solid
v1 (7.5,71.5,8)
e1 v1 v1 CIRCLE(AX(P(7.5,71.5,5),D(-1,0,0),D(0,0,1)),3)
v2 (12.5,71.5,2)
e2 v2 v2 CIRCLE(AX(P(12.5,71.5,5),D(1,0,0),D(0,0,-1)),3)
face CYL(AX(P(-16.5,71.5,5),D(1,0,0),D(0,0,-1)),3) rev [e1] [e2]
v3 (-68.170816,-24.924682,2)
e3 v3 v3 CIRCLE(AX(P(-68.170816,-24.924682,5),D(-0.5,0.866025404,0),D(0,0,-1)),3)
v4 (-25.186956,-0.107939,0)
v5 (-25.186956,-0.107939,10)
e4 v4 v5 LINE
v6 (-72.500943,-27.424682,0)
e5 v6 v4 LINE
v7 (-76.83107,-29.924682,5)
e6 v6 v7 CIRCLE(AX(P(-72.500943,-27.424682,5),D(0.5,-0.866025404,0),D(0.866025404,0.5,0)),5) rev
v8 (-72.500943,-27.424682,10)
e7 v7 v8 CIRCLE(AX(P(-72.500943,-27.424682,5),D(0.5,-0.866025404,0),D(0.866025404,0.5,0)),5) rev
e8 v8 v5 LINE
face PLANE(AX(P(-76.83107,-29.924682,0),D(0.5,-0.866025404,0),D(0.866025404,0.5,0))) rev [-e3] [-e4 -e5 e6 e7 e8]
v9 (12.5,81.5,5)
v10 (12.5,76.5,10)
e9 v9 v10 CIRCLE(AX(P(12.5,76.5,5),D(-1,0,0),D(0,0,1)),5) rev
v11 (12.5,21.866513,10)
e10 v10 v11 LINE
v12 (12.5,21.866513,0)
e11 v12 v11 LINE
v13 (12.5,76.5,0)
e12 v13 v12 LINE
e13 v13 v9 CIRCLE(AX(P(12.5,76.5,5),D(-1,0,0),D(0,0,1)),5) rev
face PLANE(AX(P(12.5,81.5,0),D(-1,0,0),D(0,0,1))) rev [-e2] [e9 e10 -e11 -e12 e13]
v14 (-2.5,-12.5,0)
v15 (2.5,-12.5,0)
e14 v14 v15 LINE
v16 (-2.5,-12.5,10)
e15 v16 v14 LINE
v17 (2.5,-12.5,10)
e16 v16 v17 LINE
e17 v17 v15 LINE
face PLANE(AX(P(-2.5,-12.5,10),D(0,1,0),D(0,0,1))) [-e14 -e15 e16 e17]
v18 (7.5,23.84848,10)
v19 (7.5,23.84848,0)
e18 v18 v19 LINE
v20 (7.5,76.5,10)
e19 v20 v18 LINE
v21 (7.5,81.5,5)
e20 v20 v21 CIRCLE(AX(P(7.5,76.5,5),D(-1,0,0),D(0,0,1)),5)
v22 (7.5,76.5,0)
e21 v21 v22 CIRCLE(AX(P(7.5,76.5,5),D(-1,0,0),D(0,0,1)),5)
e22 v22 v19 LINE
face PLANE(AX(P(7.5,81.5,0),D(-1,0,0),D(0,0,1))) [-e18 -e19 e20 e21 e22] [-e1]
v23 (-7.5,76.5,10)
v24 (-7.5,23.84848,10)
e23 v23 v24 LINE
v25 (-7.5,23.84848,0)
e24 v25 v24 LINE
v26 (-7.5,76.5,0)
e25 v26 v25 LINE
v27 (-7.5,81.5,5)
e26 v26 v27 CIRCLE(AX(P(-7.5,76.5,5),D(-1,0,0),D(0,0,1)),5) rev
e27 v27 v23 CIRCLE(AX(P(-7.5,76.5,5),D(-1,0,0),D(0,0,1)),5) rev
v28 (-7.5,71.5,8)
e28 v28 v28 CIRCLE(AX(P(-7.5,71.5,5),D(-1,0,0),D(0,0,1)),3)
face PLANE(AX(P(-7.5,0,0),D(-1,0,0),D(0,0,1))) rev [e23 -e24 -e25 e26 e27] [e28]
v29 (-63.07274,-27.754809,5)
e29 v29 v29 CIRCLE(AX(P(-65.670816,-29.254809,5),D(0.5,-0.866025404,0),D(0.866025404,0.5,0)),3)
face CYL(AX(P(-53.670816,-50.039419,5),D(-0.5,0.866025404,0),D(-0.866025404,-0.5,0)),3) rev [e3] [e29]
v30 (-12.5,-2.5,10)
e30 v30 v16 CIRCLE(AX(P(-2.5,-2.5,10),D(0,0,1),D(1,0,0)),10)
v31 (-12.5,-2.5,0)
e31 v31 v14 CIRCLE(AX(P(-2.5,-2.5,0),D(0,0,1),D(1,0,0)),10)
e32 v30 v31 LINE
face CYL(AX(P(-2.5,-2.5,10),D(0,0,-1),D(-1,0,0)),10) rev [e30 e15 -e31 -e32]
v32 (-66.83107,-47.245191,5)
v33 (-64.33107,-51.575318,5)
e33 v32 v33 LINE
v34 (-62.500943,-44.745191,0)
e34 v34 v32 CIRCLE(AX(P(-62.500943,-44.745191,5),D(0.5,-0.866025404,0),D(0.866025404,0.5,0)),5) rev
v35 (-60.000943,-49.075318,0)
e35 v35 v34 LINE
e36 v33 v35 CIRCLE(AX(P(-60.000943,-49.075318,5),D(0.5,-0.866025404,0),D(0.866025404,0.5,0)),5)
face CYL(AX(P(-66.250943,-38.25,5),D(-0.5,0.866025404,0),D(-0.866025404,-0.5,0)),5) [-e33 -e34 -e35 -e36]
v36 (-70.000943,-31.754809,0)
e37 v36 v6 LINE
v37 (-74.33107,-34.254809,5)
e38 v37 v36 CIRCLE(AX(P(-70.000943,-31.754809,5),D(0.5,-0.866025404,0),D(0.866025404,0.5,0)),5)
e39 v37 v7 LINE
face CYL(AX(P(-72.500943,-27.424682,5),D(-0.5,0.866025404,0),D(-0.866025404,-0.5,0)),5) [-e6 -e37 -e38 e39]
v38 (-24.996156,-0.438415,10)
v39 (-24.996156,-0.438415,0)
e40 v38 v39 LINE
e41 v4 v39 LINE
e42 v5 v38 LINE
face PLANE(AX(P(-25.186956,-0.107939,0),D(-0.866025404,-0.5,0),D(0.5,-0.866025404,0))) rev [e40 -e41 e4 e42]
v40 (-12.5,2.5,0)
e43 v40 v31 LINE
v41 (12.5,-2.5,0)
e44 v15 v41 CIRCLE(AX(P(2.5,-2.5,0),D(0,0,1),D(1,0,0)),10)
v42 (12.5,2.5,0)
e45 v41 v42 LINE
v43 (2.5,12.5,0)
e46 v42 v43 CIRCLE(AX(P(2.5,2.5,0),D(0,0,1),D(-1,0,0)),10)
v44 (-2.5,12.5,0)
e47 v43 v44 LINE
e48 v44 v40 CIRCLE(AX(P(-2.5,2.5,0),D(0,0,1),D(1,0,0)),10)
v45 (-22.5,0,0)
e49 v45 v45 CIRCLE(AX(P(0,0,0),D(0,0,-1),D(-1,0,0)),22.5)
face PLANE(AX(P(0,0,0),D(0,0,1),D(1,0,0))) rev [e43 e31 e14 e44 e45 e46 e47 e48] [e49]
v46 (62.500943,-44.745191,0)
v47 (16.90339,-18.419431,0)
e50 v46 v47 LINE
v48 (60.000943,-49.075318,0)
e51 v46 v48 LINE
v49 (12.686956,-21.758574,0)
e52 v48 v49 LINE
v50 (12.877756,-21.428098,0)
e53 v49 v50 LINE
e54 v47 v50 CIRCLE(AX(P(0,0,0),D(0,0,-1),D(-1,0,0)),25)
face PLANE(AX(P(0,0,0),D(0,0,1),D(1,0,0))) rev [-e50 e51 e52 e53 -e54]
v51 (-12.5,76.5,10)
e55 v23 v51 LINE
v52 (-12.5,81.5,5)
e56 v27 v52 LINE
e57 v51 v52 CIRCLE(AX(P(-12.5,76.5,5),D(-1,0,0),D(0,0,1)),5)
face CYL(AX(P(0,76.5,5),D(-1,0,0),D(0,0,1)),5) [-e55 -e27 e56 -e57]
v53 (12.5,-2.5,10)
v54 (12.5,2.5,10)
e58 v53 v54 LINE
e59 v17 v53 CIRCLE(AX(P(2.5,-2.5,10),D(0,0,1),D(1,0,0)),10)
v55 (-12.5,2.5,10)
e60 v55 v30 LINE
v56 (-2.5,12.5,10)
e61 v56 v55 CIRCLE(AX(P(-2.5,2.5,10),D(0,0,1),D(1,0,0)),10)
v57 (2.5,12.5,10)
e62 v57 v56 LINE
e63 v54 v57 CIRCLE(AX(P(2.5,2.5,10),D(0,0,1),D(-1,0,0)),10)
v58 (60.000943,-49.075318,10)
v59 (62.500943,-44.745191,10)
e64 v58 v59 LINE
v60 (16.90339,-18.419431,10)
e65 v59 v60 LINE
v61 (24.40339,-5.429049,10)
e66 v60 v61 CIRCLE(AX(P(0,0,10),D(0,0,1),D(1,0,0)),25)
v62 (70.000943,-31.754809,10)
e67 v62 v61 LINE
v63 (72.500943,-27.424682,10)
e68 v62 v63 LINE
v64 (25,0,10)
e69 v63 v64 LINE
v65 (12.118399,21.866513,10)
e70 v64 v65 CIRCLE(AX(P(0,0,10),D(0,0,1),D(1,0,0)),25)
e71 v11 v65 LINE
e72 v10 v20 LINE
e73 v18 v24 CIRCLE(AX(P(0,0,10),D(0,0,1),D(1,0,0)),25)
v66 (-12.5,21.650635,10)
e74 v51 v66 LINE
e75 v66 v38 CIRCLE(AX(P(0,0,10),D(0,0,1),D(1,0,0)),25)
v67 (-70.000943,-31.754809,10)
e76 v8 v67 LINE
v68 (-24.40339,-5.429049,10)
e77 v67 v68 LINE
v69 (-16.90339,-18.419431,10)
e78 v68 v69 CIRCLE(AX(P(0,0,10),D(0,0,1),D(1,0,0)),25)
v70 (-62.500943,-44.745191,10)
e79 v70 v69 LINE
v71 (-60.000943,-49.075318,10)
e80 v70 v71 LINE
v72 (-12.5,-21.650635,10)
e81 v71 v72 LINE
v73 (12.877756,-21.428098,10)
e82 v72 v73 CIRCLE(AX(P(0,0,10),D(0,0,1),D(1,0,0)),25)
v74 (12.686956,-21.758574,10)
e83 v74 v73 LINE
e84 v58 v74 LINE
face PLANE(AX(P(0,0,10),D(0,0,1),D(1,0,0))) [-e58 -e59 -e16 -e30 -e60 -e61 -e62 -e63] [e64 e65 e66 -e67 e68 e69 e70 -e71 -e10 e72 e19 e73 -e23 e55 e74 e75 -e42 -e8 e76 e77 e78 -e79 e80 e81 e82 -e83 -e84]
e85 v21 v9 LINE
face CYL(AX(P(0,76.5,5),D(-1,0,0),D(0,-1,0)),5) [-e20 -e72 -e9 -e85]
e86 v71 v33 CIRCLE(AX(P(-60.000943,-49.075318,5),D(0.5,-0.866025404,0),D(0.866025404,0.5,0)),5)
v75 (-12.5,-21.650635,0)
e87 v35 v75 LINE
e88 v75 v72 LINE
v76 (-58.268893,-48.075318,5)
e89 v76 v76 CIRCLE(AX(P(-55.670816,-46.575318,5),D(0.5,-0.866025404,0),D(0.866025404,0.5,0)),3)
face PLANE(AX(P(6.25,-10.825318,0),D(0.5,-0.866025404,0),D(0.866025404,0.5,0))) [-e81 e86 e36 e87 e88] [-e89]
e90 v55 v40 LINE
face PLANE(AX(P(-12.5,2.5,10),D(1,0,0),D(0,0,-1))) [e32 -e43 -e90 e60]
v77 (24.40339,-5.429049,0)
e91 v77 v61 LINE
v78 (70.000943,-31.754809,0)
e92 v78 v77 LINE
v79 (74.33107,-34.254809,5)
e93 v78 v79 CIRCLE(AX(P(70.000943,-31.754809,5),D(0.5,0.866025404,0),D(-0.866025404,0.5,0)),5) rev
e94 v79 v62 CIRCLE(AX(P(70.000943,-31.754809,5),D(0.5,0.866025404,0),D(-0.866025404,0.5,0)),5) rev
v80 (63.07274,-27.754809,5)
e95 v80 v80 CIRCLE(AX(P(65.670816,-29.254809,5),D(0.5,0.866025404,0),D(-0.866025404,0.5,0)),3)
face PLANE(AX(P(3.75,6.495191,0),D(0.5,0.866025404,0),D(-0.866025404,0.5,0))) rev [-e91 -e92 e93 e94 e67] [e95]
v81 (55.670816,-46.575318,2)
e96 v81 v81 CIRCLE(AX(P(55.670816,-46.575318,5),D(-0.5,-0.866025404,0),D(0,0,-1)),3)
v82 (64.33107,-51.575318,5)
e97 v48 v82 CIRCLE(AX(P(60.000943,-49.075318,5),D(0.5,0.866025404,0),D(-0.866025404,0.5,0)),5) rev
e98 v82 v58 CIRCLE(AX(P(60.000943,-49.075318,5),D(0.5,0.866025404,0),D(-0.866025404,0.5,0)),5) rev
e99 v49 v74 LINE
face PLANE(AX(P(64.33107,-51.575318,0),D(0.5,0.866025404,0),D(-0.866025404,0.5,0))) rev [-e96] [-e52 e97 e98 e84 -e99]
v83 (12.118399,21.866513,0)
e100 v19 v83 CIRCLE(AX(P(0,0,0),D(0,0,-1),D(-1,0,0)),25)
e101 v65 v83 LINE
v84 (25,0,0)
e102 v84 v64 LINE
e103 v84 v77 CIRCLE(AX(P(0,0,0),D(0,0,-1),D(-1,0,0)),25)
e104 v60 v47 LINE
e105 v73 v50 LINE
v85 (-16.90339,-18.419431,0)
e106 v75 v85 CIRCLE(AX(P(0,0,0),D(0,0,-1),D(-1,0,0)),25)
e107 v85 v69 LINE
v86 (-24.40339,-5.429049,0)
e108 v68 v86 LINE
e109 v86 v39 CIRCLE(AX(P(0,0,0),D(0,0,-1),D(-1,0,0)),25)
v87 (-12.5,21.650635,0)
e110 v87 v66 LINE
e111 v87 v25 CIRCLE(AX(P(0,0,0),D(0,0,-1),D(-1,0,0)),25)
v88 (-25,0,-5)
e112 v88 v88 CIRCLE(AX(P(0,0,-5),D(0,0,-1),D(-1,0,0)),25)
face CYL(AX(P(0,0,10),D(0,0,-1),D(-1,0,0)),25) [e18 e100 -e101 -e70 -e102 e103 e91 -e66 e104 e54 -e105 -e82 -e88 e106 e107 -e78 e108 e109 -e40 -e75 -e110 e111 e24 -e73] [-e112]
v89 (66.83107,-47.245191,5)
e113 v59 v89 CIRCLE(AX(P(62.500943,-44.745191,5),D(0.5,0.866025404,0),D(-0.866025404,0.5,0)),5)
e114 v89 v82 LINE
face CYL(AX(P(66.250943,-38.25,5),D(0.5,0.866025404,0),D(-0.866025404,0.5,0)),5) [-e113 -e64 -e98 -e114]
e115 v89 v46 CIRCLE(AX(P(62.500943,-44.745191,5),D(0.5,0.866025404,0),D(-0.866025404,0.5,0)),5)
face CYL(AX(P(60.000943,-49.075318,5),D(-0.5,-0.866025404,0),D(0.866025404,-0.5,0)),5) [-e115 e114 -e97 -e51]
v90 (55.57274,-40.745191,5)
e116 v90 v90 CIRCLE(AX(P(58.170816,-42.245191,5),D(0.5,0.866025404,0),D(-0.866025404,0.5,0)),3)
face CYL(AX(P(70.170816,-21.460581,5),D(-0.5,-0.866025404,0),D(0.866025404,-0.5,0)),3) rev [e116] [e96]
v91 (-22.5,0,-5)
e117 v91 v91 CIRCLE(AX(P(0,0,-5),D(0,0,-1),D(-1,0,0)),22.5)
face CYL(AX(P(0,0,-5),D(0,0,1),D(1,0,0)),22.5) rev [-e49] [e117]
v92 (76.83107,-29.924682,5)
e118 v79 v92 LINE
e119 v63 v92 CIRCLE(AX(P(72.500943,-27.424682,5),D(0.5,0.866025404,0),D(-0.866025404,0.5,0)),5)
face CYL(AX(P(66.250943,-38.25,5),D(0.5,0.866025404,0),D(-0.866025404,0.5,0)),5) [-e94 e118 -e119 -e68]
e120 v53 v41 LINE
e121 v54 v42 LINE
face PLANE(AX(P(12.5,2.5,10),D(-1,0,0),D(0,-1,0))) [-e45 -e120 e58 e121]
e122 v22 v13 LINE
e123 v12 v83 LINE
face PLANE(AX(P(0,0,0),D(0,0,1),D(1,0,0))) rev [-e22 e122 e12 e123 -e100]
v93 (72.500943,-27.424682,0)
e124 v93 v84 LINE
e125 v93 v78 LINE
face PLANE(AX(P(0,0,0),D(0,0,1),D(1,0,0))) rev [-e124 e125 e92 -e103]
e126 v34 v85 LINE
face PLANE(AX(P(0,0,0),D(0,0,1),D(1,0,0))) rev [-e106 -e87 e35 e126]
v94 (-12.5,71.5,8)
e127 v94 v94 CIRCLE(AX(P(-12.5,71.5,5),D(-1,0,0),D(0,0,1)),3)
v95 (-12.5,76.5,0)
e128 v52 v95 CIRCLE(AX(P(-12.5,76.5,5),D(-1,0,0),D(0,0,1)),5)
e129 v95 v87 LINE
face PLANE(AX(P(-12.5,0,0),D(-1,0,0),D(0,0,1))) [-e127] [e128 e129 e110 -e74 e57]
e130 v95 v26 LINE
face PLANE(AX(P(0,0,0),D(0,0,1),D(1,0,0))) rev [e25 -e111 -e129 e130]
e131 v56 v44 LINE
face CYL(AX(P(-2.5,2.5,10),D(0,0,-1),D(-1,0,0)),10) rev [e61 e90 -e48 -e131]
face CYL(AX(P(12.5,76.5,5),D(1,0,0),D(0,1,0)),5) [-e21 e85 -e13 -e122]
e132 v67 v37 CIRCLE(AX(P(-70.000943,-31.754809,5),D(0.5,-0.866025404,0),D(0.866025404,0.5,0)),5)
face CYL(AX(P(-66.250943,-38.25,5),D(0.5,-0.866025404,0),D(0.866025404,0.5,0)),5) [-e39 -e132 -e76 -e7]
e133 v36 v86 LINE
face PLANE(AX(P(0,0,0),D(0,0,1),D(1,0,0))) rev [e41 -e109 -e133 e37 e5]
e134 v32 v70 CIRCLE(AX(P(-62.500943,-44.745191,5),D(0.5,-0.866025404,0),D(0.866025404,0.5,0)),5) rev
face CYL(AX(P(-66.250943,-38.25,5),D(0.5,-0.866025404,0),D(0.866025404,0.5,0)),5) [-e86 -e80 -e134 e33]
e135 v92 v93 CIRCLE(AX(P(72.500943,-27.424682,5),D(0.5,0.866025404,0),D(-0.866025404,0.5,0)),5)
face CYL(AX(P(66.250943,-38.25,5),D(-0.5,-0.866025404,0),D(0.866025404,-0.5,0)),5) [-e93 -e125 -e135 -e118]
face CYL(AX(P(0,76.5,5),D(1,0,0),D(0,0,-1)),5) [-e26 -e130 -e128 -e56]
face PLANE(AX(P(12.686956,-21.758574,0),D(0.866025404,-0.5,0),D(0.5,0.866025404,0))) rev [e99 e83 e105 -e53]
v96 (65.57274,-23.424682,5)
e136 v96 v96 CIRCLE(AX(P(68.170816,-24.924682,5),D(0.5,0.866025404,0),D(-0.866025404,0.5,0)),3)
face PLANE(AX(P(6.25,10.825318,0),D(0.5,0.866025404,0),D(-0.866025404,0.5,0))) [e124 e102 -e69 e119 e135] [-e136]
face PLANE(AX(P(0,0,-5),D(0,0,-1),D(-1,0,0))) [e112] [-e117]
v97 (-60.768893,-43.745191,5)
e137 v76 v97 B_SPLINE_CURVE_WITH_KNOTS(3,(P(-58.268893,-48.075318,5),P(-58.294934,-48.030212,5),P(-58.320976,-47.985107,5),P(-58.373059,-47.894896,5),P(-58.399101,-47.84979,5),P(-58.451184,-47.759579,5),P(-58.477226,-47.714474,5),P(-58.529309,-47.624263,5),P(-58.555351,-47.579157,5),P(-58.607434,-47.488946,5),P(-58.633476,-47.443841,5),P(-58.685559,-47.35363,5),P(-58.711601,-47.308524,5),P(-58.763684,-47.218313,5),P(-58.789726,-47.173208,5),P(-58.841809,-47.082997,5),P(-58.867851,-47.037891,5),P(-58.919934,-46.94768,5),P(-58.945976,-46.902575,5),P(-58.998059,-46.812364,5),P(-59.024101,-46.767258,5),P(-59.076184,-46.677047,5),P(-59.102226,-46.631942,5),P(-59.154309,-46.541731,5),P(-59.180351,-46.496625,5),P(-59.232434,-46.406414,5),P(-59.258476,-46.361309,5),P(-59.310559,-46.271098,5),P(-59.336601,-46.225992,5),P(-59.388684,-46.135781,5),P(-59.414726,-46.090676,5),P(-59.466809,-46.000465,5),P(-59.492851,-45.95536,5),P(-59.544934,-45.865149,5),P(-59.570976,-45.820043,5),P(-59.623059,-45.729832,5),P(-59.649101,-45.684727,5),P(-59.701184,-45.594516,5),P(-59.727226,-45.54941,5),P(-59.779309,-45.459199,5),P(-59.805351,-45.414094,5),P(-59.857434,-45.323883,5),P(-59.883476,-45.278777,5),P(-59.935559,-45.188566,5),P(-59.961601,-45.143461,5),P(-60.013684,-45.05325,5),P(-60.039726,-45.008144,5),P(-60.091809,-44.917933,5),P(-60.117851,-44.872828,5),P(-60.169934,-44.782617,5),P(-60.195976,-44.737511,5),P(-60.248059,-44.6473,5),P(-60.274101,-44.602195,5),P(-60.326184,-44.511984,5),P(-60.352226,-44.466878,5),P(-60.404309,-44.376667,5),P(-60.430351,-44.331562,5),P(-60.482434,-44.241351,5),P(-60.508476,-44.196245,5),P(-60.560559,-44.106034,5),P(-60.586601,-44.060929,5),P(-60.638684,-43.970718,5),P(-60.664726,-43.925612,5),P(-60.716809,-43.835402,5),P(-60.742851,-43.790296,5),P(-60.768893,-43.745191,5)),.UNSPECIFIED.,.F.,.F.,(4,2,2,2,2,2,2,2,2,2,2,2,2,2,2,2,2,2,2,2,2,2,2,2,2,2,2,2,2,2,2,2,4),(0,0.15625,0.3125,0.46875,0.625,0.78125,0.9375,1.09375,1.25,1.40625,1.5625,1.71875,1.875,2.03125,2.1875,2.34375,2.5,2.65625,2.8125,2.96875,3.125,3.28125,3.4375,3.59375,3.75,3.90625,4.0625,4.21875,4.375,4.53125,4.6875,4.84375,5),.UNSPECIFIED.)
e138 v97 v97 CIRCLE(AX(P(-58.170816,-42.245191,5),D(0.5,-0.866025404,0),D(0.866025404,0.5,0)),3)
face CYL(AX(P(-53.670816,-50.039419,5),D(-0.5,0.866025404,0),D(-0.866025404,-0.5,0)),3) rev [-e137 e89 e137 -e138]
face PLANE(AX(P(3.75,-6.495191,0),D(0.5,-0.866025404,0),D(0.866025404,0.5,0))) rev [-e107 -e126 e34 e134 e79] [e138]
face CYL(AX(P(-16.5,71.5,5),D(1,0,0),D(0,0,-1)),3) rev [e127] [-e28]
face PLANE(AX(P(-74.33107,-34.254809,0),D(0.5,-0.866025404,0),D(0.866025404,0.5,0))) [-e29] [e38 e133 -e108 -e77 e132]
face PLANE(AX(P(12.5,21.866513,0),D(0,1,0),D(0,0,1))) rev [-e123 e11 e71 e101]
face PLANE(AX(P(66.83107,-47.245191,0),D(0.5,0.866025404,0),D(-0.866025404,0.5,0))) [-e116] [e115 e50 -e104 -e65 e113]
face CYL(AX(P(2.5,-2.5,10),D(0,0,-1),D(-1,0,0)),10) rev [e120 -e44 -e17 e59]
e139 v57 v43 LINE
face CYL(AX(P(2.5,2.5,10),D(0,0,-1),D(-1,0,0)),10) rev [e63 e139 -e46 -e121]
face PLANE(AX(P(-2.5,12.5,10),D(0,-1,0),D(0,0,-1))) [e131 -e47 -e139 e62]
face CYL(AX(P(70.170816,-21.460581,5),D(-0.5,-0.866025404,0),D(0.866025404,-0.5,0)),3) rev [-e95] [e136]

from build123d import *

# Parameters (mm, degrees)
SKETCH1_R                = 25
BOSS_EXTRUDE1_DEPTH      = 10
BOSS_EXTRUDE3_START      = -10
SKETCH2_W                = 5
SKETCH2_H                = 59.633486872
BOSS_EXTRUDE3_DEPTH      = 10
SKETCH3_R                = 3
CUT_EXTRUDE1_DEPTH       = 29
FILLET1_R                = 5
CIRPATTERN1_COUNT        = 3
FILLET1_OF_CIRPATTERN1_R = 5
BOSS_EXTRUDE5_START      = 5
SKETCH5_R                = 25
SKETCH5_R_2              = 22.5
BOSS_EXTRUDE5_DEPTH      = 5


with BuildPart() as part:
    # Sketch1 → Boss-Extrude1 (new body)
    with BuildSketch(Plane.XY):
        Circle(SKETCH1_R)
        with BuildLine():
            Line((-2.5, 12.5), (2.5, 12.5))
            ThreePointArc((2.5, 12.5), (9.571067812, 9.571067812), (12.5, 2.5))
            Line((12.5, 2.5), (12.5, -2.5))
            ThreePointArc((12.5, -2.5), (9.571067812, -9.571067812), (2.5, -12.5))
            Line((2.5, -12.5), (-2.5, -12.5))
            ThreePointArc((-2.5, -12.5), (-9.571067812, -9.571067812), (-12.5, -2.5))
            Line((-12.5, -2.5), (-12.5, 2.5))
            ThreePointArc((-12.5, 2.5), (-9.571067812, 9.571067812), (-2.5, 12.5))
        make_face(mode=Mode.SUBTRACT)
    extrude(amount=BOSS_EXTRUDE1_DEPTH)

    # Sketch2 → Boss-Extrude3 (add)
    with BuildSketch(Plane.XY.offset(10).offset(BOSS_EXTRUDE3_START)):
        with BuildLine():
            Line((-7.5, 81.5), (-12.5, 81.5))
            Line((-12.5, 81.5), (-12.5, 21.650635095))
            ThreePointArc((-12.5, 21.650635095), (-10.060200326, 22.886510643), (-7.5, 23.848480035))
            Line((-7.5, 23.848480035), (-7.5, 81.5))
        make_face()
        with Locations((10, 51.683256564)):
            Rectangle(SKETCH2_W, SKETCH2_H)
    boss_extrude3 = extrude(amount=BOSS_EXTRUDE3_DEPTH)

    # Sketch3 → Cut-Extrude1 (cut)
    with BuildSketch(Plane(origin=(12.5, 0, 0), x_dir=(0, 0, -1), z_dir=(1, 0, 0))):
        with Locations((-5, 71.5)):
            Circle(SKETCH3_R)
    cut_extrude1 = extrude(amount=-CUT_EXTRUDE1_DEPTH, mode=Mode.SUBTRACT)

    # Fillet1
    fillet1_edges = [part.edges().sort_by_distance(p)[0] for p in [
        (-10, 81.5, 10),
        (-10, 81.5, 0),
        (10, 81.5, 10),
        (10, 81.5, 0),
    ]]
    fillet(fillet1_edges, radius=FILLET1_R - 0.0001)  # a hair under: the kernel refuses the full size

    # CirPattern1: Boss-Extrude3, Cut-Extrude1 ×3 about axis
    cirpattern1_axis = Axis((0, 0, 0), (0, 0, 1))
    add([boss_extrude3.rotate(cirpattern1_axis, i * 360 / CIRPATTERN1_COUNT) for i in range(1, CIRPATTERN1_COUNT)])
    add([cut_extrude1.rotate(cirpattern1_axis, i * 360 / CIRPATTERN1_COUNT) for i in range(1, CIRPATTERN1_COUNT)], mode=Mode.SUBTRACT)

    # Fillet1 of CirPattern1
    fillet1_of_cirpattern1_edges = [part.edges().sort_by_distance(p)[0] for p in [
        (-65.581070408, -49.410254038, 10),
        (-65.581070408, -49.410254038, 0),
        (-75.581070408, -32.089745962, 10),
        (-75.581070408, -32.089745962, 0),
        (75.581070408, -32.089745962, 10),
        (75.581070408, -32.089745962, 0),
        (65.581070408, -49.410254038, 10),
        (65.581070408, -49.410254038, 0),
    ]]
    fillet(fillet1_of_cirpattern1_edges, radius=FILLET1_OF_CIRPATTERN1_R - 0.0001)  # a hair under: the kernel refuses the full size

    # Sketch5 → Boss-Extrude5 (add)
    with BuildSketch(Plane(origin=(0, 0, 0), x_dir=(-1, 0, 0), z_dir=(0, 0, -1)).offset(BOSS_EXTRUDE5_START)):
        Circle(SKETCH5_R)
        Circle(SKETCH5_R_2, mode=Mode.SUBTRACT)
    extrude(amount=-BOSS_EXTRUDE5_DEPTH)


solid = part.part
